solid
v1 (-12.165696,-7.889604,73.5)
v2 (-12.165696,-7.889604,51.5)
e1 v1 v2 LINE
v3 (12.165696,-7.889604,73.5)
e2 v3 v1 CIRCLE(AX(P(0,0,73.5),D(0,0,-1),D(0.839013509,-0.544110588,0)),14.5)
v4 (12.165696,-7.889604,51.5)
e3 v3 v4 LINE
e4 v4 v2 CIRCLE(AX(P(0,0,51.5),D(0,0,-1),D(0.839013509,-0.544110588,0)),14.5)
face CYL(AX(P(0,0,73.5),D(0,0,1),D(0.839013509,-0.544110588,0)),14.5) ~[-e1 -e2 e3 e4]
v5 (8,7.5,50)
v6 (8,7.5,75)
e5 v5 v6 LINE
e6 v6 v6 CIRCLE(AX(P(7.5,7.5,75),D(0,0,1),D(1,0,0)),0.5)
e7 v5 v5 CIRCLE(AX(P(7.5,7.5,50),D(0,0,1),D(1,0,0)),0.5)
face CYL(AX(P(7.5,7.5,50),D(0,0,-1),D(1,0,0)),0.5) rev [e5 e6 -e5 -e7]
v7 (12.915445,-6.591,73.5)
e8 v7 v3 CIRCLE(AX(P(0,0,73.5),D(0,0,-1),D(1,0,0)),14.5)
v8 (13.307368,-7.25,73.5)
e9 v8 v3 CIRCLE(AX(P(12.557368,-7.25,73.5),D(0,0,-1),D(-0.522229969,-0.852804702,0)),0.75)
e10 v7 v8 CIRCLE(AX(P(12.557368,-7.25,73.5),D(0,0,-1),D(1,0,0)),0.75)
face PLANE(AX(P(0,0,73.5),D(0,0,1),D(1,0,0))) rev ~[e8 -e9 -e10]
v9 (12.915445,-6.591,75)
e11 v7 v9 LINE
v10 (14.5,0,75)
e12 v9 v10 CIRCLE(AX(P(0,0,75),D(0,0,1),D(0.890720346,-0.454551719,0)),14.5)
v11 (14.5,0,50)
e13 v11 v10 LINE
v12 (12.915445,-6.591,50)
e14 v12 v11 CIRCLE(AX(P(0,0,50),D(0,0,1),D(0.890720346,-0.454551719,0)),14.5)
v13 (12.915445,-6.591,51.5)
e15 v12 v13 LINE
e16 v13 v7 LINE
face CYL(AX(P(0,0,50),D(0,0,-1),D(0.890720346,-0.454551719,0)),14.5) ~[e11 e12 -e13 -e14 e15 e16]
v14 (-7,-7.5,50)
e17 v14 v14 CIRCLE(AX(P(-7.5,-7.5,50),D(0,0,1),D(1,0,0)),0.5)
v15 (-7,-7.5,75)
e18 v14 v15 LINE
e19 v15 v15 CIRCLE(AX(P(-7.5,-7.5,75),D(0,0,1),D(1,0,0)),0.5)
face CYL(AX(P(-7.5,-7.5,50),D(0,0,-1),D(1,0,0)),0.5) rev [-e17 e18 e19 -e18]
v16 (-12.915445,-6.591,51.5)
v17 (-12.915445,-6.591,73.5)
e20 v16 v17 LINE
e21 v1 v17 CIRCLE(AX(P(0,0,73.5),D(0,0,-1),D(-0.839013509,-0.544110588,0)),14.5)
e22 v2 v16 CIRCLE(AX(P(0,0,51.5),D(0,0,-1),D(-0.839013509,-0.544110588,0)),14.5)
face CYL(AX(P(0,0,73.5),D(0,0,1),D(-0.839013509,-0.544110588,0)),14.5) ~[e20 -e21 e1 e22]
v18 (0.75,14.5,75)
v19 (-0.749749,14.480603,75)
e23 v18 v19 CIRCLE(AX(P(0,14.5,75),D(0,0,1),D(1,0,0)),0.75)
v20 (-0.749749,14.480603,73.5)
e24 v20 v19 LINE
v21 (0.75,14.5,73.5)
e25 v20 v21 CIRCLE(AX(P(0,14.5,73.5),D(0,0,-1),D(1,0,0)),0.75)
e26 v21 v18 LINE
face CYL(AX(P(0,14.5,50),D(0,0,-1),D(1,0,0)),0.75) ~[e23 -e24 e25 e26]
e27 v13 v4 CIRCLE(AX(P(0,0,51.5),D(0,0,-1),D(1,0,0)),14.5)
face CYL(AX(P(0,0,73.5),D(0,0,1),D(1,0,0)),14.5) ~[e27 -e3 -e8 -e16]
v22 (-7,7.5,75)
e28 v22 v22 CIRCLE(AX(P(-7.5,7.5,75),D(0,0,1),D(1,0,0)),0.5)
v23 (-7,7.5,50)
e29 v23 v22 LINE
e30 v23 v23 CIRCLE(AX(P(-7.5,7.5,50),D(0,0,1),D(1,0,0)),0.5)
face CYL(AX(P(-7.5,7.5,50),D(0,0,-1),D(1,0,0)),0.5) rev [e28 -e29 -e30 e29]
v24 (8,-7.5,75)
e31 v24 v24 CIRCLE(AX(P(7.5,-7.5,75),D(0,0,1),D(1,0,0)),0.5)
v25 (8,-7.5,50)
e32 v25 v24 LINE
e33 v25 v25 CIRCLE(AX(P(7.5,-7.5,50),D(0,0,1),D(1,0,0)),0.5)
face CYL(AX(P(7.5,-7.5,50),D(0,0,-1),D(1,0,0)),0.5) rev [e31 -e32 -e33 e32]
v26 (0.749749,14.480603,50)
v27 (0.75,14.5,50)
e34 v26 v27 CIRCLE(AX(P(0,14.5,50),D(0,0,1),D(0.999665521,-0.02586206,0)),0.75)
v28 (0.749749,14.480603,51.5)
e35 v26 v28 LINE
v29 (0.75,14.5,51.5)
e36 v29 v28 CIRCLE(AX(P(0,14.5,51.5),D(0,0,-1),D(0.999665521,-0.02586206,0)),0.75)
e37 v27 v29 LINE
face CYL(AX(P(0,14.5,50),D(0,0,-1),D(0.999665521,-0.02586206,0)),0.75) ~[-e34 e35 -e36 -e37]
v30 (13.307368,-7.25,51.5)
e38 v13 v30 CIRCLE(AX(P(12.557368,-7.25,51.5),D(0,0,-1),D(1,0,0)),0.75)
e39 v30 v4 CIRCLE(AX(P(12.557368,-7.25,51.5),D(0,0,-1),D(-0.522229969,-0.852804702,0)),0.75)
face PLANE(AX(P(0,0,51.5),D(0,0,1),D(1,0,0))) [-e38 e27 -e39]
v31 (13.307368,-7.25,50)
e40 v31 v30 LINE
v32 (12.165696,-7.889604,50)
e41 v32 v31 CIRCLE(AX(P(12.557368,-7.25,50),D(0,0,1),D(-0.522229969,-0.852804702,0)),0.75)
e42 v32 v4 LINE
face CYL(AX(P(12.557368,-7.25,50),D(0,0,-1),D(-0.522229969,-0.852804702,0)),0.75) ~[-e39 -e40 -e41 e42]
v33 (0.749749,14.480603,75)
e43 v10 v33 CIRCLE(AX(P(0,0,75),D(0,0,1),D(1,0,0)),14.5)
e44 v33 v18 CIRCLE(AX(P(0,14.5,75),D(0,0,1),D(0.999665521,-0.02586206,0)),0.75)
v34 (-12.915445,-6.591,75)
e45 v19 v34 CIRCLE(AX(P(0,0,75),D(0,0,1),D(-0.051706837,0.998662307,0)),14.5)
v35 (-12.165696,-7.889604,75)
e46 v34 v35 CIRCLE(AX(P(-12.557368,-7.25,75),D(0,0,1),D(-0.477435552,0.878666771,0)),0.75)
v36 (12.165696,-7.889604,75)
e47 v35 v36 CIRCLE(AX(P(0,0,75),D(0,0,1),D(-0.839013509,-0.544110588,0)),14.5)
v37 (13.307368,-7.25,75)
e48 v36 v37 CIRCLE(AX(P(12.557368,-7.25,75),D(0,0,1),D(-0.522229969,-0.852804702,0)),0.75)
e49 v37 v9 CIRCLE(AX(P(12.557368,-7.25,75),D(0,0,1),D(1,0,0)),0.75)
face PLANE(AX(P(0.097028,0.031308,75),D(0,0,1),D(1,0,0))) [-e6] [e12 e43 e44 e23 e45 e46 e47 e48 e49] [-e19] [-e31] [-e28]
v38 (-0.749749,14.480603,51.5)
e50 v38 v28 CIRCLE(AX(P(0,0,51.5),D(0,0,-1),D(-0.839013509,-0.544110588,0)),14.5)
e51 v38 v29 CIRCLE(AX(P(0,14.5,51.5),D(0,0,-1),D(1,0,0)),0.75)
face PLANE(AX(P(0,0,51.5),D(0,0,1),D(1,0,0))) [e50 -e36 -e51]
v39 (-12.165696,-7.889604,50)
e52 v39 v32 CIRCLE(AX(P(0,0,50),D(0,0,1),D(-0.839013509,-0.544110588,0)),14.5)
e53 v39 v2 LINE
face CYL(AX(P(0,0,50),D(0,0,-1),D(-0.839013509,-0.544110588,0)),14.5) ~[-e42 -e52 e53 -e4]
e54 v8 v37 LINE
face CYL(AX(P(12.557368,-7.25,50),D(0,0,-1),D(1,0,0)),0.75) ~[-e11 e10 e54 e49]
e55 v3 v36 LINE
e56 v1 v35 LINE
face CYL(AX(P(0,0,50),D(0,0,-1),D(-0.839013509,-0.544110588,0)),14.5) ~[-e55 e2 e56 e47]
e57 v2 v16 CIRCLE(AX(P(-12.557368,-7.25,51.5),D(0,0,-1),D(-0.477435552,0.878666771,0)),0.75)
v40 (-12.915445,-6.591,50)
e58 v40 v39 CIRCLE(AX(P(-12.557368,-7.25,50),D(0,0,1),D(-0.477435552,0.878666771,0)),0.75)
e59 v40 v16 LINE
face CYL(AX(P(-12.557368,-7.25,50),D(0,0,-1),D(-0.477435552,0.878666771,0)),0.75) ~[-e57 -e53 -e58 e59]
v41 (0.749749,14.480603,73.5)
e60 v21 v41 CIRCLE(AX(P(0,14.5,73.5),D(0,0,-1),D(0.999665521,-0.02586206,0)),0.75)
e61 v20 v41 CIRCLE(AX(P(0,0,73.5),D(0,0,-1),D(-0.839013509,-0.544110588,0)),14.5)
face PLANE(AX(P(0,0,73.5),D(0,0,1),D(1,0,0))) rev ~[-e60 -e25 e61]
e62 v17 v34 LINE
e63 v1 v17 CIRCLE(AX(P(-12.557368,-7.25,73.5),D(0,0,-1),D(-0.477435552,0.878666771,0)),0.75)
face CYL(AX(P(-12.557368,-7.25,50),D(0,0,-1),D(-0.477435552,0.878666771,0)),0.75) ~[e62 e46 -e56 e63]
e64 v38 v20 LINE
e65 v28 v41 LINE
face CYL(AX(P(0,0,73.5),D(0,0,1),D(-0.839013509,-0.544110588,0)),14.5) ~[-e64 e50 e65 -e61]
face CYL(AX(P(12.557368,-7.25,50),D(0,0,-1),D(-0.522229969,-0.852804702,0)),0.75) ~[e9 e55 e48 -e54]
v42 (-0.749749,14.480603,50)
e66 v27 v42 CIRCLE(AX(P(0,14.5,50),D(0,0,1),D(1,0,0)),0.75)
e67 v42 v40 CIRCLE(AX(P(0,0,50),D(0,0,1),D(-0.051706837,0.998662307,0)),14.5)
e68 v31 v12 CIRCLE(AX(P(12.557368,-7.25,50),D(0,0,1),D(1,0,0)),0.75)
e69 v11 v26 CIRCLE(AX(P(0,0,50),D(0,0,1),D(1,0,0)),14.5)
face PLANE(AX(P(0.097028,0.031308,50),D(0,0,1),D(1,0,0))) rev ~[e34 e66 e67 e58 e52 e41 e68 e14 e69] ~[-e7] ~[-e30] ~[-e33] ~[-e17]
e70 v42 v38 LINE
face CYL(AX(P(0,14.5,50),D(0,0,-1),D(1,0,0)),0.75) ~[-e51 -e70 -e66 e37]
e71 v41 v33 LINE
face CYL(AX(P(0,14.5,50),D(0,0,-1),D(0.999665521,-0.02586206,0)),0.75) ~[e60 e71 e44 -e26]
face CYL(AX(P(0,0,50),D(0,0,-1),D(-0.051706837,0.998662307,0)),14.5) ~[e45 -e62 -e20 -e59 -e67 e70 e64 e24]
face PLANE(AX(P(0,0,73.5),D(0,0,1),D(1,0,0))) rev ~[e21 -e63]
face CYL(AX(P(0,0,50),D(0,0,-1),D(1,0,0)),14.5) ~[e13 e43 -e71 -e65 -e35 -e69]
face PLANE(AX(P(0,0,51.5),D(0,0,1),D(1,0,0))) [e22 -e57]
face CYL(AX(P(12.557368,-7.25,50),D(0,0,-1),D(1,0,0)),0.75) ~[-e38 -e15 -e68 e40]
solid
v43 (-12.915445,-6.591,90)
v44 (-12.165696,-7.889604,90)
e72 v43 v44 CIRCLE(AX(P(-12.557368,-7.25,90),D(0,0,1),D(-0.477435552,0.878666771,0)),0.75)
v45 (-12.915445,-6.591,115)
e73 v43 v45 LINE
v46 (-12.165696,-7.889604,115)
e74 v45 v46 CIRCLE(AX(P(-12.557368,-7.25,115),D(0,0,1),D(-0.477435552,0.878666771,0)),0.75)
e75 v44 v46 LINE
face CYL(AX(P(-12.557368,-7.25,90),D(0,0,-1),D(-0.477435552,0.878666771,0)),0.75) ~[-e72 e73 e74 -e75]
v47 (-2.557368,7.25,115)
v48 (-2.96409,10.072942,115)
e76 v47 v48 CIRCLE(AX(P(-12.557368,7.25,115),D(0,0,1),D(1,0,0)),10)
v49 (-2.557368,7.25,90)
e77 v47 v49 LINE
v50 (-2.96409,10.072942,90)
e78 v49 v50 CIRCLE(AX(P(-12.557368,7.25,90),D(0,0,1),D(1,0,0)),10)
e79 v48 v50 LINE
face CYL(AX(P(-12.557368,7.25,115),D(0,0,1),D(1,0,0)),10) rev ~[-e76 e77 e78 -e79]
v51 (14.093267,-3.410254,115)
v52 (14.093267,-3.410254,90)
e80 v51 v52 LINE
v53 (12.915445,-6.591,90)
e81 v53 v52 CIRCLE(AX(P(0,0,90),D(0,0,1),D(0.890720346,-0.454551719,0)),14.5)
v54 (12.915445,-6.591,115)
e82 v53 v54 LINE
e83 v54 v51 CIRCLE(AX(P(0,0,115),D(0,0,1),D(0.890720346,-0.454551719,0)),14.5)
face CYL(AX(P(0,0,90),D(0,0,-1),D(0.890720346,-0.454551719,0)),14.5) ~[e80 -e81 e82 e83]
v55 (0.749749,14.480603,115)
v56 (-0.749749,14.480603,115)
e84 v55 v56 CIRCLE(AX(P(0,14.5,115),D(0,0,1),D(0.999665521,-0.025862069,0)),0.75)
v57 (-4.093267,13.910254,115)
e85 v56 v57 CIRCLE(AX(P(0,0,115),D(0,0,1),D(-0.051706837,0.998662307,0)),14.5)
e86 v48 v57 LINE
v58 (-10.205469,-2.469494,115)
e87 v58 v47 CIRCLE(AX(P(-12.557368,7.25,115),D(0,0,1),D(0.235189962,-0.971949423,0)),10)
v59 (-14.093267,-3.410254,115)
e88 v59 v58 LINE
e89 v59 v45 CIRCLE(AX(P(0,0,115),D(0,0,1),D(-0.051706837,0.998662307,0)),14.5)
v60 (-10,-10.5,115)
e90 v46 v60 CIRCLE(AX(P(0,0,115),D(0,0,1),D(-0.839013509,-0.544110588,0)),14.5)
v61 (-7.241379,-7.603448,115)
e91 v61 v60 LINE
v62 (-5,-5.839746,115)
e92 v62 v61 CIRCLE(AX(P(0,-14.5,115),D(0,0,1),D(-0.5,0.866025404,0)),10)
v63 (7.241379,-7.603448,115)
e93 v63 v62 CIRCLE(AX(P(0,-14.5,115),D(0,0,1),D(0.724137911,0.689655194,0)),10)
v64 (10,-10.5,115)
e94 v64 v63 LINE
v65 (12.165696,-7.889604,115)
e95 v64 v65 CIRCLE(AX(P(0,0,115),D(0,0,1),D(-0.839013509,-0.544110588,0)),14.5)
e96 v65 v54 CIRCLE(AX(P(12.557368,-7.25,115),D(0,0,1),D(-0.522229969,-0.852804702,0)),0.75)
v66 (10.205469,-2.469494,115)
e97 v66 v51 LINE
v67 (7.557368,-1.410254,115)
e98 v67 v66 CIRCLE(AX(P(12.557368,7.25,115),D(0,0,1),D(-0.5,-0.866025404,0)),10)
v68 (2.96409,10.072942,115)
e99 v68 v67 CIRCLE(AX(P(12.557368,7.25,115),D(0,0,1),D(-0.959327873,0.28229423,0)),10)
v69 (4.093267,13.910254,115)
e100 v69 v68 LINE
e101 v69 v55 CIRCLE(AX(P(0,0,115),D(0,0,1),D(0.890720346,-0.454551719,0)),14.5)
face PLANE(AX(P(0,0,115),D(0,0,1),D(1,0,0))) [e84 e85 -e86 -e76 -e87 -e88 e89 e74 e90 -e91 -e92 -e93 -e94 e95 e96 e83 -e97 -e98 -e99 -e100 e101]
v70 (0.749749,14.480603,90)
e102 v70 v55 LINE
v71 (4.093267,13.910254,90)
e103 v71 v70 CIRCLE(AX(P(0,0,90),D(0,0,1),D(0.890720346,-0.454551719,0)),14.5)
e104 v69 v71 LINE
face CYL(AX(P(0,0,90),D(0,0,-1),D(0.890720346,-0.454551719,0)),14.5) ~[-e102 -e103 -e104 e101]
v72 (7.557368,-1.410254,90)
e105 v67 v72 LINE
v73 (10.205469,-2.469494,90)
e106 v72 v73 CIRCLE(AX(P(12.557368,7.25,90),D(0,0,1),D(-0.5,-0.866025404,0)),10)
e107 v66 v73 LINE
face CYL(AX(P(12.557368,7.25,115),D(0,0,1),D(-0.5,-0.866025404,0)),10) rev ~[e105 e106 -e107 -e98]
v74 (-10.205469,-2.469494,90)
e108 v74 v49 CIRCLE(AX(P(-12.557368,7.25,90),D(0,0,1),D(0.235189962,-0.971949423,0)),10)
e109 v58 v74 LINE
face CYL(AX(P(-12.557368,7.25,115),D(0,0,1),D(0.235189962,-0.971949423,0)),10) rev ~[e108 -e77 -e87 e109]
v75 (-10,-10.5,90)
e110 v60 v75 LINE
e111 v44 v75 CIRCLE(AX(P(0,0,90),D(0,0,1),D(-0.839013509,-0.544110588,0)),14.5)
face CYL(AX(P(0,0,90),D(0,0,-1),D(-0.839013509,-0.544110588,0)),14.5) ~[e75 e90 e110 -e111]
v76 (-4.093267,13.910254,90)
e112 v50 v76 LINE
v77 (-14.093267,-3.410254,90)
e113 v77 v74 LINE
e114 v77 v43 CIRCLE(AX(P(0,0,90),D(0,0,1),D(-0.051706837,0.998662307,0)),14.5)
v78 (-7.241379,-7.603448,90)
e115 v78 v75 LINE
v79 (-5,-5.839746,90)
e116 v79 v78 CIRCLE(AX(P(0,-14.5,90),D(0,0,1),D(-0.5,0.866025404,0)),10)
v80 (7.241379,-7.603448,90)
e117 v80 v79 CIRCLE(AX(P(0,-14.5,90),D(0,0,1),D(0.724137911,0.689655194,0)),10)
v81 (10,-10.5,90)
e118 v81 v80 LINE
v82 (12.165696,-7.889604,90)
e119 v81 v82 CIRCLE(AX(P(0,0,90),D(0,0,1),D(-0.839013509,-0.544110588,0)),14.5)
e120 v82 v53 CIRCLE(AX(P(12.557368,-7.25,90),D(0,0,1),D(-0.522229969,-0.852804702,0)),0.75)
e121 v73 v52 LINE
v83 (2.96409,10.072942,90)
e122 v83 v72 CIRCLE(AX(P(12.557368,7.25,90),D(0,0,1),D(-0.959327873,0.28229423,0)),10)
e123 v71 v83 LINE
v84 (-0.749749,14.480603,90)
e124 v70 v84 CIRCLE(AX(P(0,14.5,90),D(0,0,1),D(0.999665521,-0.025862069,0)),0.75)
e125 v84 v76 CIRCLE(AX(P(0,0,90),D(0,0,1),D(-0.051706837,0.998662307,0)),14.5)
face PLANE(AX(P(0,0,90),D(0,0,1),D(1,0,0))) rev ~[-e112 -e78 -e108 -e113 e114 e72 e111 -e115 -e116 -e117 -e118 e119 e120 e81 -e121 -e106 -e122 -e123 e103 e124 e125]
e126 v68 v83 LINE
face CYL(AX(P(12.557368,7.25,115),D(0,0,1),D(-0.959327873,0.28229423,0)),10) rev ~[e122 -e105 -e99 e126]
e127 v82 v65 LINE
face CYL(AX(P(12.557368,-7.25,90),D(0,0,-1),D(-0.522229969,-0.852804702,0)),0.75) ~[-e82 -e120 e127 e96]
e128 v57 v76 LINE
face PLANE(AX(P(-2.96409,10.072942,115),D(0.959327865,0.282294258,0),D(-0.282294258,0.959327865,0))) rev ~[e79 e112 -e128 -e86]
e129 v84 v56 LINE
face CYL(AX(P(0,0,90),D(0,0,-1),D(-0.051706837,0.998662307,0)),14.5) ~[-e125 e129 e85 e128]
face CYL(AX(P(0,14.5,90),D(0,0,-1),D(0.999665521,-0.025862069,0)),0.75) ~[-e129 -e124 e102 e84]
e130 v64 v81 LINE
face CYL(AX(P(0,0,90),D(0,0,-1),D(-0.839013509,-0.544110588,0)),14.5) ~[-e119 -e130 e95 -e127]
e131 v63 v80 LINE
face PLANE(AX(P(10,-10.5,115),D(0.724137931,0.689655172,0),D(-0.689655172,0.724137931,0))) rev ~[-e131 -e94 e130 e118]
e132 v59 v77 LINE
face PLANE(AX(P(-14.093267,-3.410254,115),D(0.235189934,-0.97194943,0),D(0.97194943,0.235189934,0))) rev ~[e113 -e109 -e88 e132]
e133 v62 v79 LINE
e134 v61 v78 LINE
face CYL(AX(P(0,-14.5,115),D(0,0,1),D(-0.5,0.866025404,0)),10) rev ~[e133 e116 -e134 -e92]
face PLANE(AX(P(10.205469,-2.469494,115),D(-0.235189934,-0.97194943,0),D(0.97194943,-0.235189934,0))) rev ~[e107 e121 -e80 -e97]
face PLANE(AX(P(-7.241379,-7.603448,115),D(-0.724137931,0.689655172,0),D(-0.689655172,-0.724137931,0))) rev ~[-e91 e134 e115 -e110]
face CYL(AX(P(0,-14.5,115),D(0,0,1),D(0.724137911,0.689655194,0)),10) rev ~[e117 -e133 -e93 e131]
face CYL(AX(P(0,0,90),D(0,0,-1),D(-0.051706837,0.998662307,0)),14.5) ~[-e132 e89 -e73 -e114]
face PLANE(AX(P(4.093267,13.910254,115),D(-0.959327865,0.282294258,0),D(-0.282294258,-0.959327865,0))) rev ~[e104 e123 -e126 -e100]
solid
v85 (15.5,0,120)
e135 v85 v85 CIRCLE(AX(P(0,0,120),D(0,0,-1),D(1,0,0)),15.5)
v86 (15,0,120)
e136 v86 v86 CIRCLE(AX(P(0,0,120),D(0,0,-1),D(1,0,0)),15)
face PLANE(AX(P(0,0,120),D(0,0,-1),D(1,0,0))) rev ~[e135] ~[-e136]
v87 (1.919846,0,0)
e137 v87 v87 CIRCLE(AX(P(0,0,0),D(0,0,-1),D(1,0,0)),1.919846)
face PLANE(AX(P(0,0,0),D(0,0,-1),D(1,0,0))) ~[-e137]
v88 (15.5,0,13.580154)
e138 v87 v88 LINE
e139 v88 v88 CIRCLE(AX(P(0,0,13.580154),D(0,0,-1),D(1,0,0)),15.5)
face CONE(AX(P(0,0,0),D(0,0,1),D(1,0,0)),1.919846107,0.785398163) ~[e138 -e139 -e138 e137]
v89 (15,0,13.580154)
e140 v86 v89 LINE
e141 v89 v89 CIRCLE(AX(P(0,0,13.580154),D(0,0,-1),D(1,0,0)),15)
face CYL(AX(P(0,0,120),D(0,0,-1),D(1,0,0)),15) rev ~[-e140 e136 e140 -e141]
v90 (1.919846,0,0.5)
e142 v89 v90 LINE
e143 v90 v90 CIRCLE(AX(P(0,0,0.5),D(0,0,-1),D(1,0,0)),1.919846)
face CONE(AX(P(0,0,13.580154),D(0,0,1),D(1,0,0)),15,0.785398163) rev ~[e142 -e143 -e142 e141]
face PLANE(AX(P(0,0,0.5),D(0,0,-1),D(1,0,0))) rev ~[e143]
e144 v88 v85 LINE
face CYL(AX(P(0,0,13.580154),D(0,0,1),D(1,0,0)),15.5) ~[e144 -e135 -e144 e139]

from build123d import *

# Parameters (mm, degrees)
F3_R            = 0.5
F4_DEPTH        = 25
F6_R            = 1.517812702
F7_DEPTH        = 25
F8_R            = 1.517812702
F9_DEPTH        = 25
F9_COPIES_COUNT = 3
F12_R           = 20.7909194511
F13_DEPTH       = 22


# Not quite as in the source:
# - a pattern or mirror of a feature is missing from the dataset's text; its kind, count and spacing are read off the source's solid


with BuildPart() as f1:
    # F0 (on Front) → F1 (revolve)
    with BuildSketch(Plane.XZ):
        Polygon((0, 0.5), (0, 0), (1.9198461069, 0), (15.5, 13.5801538931), (15.5, 120), (15, 120), (15, 13.5801538931), (1.9198461069, 0.5), align=None)
    revolve(axis=Axis((0, 0, 0.25), (0, 0, -1)))


with BuildPart() as f4:
    # F3 (on offset) → F4 (new body)
    with BuildSketch(Plane.XY.offset(50)):
        with BuildLine():
            ThreePointArc((12.9154450186, -6.5909999219), (14.0982969321, -3.38939871), (14.5, 0))
            ThreePointArc((14.5, 0), (10.5147839383, 9.9844538524), (0.7497491406, 14.4806034483))
            ThreePointArc((0.7497491406, 14.4806034483), (0, 13.75), (-0.7497491406, 14.4806034483))
            ThreePointArc((-0.7497491406, 14.4806034483), (-12.5573683549, 7.25), (-12.9154450186, -6.5909999219))
            ThreePointArc((-12.9154450186, -6.5909999219), (-12.1740000579, -6.6053848056), (-11.8073683549, -7.25))
            ThreePointArc((-11.8073683549, -7.25), (-11.9030540735, -7.6165689856), (-12.1656958781, -7.8896035263))
            ThreePointArc((-12.1656958781, -7.8896035263), (0, -14.5), (12.1656958781, -7.8896035263))
            ThreePointArc((12.1656958781, -7.8896035263), (11.907849302, -6.875), (12.9154450186, -6.5909999219))
        make_face()
        with Locations((-7.5, -7.5)):
            Circle(F3_R, mode=Mode.SUBTRACT)
        with Locations((7.5, -7.5)):
            Circle(F3_R, mode=Mode.SUBTRACT)
        with Locations((-7.5, 7.5)):
            Circle(F3_R, mode=Mode.SUBTRACT)
        with Locations((7.5, 7.5)):
            Circle(F3_R, mode=Mode.SUBTRACT)
        with BuildLine():
            ThreePointArc((-0.7497491406, 14.4806034483), (0, 13.75), (0.7497491406, 14.4806034483))
            ThreePointArc((0.7497491406, 14.4806034483), (0, 14.5), (-0.7497491406, 14.4806034483))
        make_face()
        with BuildLine():
            ThreePointArc((-0.7497491406, 14.4806034483), (0, 14.5), (0.7497491406, 14.4806034483))
            ThreePointArc((0.7497491406, 14.4806034483), (0.7499372825, 14.4903009131), (0.75, 14.5))
            ThreePointArc((0.75, 14.5), (-0.0096990869, 15.2499372825), (-0.7497491406, 14.4806034483))
        make_face()
        with BuildLine():
            ThreePointArc((13.3073683549, -7.25), (13.2019835493, -6.8666317031), (12.9154450186, -6.5909999219))
            ThreePointArc((12.9154450186, -6.5909999219), (12.5573683549, -7.25), (12.1656958781, -7.8896035263))
            ThreePointArc((12.1656958781, -7.8896035263), (12.9239373405, -7.9043142814), (13.3073683549, -7.25))
        make_face()
        with BuildLine():
            ThreePointArc((12.1656958781, -7.8896035263), (12.5573683549, -7.25), (12.9154450186, -6.5909999219))
            ThreePointArc((12.9154450186, -6.5909999219), (11.907849302, -6.875), (12.1656958781, -7.8896035263))
        make_face()
        with BuildLine():
            ThreePointArc((-11.8073683549, -7.25), (-12.1740000579, -6.6053848056), (-12.9154450186, -6.5909999219))
            ThreePointArc((-12.9154450186, -6.5909999219), (-12.5573683549, -7.25), (-12.1656958781, -7.8896035263))
            ThreePointArc((-12.1656958781, -7.8896035263), (-11.9030540735, -7.6165689856), (-11.8073683549, -7.25))
        make_face()
        with BuildLine():
            ThreePointArc((-12.1656958781, -7.8896035263), (-12.5573683549, -7.25), (-12.9154450186, -6.5909999219))
            ThreePointArc((-12.9154450186, -6.5909999219), (-13.2068874077, -7.625), (-12.1656958781, -7.8896035263))
        make_face()
    extrude(amount=F4_DEPTH)

    # F12 (on offset) → F13 (cut, through all)
    with BuildSketch(Plane.XY.offset(73.5)):
        Circle(F12_R)
        with BuildLine():
            ThreePointArc((12.1656958781, -7.8896035263), (0, -14.5), (-12.1656958781, -7.8896035263))
            ThreePointArc((-12.1656958781, -7.8896035263), (-4.1138430797, 13.9041826482), (14.5, 0))
            ThreePointArc((14.5, 0), (13.9041826482, -4.1138430797), (12.1656958781, -7.8896035263))
        make_face(mode=Mode.SUBTRACT)
    extrude(amount=-F13_DEPTH, mode=Mode.SUBTRACT)


with BuildPart() as f7:
    # F6 (on offset) → F7 (new body)
    with BuildSketch(Plane.XY.offset(90)):
        with BuildLine():
            ThreePointArc((12.9154450186, -6.5909999219), (12.5573683549, 7.25), (0.7497491406, 14.4806034483))
            ThreePointArc((0.7497491406, 14.4806034483), (0, 15.25), (-0.7497491406, 14.4806034483))
            ThreePointArc((-0.7497491406, 14.4806034483), (-12.5573683549, 7.25), (-12.9154450186, -6.5909999219))
            ThreePointArc((-12.9154450186, -6.5909999219), (-13.2068874077, -7.625), (-12.1656958781, -7.8896035263))
            ThreePointArc((-12.1656958781, -7.8896035263), (0, -14.5), (12.1656958781, -7.8896035263))
            ThreePointArc((12.1656958781, -7.8896035263), (13.2068874077, -7.625), (12.9154450186, -6.5909999219))
        make_face()
        with Locations((-7.5, 7.5)):
            Circle(F6_R, mode=Mode.SUBTRACT)
    extrude(amount=F7_DEPTH)

    # F8 (on face) → F9 (cut)
    with BuildSketch(Plane.XY.offset(115)):
        with BuildLine():
            ThreePointArc((-14.2644040621, -2.6032242994), (-12.5573683549, 7.25), (-4.877743656, 13.6549484373))
            ThreePointArc((-4.877743656, 13.6549484373), (-21.2176223927, 12.25), (-14.2644040621, -2.6032242994))
        make_face()
        with BuildLine():
            ThreePointArc((-10.2054687337, -2.4694942344), (-4.6986472053, 1.0661094856), (-2.5573683549, 7.25))
            ThreePointArc((-2.5573683549, 7.25), (-2.6595709496, 8.6760457652), (-2.9640896598, 10.072942415))
            ThreePointArc((-2.9640896598, 10.072942415), (-3.7371648595, 11.9621131459), (-4.877743656, 13.6549484373))
            ThreePointArc((-4.877743656, 13.6549484373), (-12.5573683549, 7.25), (-14.2644040621, -2.6032242994))
            ThreePointArc((-14.2644040621, -2.6032242994), (-12.2280762361, -2.7445768645), (-10.2054687337, -2.4694942344))
        make_face()
        with Locations((-7.5, 7.5)):
            Circle(F8_R, mode=Mode.SUBTRACT)
        with Locations((-7.5, 7.5)):
            Circle(F8_R)
        with BuildLine():
            ThreePointArc((-4.877743656, 13.6549484373), (-3.7371648595, 11.9621131459), (-2.9640896598, 10.072942415))
            Line((-2.9640896598, 10.072942415), (-4.0932667397, 13.9102540378))
            ThreePointArc((-4.0932667397, 13.9102540378), (-4.487321263, 13.7881814567), (-4.877743656, 13.6549484373))
        make_face()
        with BuildLine():
            Line((-14.0932667397, -3.4102540378), (-10.2054687337, -2.4694942344))
            ThreePointArc((-10.2054687337, -2.4694942344), (-12.2280762361, -2.7445768645), (-14.2644040621, -2.6032242994))
            ThreePointArc((-14.2644040621, -2.6032242994), (-14.184576045, -3.0079565196), (-14.0932667397, -3.4102540378))
        make_face()
    f9 = extrude(amount=-F9_DEPTH, mode=Mode.SUBTRACT)

    # F9_copies: F9 ×3 about axis
    f9_copies_axis = Axis((0, 0, 0), (0, 0, 1))
    for i in range(1, F9_COPIES_COUNT):
        add(f9.rotate(f9_copies_axis, i * 360 / F9_COPIES_COUNT), mode=Mode.SUBTRACT)


solid = Compound([f1.part, f4.part, f7.part])
